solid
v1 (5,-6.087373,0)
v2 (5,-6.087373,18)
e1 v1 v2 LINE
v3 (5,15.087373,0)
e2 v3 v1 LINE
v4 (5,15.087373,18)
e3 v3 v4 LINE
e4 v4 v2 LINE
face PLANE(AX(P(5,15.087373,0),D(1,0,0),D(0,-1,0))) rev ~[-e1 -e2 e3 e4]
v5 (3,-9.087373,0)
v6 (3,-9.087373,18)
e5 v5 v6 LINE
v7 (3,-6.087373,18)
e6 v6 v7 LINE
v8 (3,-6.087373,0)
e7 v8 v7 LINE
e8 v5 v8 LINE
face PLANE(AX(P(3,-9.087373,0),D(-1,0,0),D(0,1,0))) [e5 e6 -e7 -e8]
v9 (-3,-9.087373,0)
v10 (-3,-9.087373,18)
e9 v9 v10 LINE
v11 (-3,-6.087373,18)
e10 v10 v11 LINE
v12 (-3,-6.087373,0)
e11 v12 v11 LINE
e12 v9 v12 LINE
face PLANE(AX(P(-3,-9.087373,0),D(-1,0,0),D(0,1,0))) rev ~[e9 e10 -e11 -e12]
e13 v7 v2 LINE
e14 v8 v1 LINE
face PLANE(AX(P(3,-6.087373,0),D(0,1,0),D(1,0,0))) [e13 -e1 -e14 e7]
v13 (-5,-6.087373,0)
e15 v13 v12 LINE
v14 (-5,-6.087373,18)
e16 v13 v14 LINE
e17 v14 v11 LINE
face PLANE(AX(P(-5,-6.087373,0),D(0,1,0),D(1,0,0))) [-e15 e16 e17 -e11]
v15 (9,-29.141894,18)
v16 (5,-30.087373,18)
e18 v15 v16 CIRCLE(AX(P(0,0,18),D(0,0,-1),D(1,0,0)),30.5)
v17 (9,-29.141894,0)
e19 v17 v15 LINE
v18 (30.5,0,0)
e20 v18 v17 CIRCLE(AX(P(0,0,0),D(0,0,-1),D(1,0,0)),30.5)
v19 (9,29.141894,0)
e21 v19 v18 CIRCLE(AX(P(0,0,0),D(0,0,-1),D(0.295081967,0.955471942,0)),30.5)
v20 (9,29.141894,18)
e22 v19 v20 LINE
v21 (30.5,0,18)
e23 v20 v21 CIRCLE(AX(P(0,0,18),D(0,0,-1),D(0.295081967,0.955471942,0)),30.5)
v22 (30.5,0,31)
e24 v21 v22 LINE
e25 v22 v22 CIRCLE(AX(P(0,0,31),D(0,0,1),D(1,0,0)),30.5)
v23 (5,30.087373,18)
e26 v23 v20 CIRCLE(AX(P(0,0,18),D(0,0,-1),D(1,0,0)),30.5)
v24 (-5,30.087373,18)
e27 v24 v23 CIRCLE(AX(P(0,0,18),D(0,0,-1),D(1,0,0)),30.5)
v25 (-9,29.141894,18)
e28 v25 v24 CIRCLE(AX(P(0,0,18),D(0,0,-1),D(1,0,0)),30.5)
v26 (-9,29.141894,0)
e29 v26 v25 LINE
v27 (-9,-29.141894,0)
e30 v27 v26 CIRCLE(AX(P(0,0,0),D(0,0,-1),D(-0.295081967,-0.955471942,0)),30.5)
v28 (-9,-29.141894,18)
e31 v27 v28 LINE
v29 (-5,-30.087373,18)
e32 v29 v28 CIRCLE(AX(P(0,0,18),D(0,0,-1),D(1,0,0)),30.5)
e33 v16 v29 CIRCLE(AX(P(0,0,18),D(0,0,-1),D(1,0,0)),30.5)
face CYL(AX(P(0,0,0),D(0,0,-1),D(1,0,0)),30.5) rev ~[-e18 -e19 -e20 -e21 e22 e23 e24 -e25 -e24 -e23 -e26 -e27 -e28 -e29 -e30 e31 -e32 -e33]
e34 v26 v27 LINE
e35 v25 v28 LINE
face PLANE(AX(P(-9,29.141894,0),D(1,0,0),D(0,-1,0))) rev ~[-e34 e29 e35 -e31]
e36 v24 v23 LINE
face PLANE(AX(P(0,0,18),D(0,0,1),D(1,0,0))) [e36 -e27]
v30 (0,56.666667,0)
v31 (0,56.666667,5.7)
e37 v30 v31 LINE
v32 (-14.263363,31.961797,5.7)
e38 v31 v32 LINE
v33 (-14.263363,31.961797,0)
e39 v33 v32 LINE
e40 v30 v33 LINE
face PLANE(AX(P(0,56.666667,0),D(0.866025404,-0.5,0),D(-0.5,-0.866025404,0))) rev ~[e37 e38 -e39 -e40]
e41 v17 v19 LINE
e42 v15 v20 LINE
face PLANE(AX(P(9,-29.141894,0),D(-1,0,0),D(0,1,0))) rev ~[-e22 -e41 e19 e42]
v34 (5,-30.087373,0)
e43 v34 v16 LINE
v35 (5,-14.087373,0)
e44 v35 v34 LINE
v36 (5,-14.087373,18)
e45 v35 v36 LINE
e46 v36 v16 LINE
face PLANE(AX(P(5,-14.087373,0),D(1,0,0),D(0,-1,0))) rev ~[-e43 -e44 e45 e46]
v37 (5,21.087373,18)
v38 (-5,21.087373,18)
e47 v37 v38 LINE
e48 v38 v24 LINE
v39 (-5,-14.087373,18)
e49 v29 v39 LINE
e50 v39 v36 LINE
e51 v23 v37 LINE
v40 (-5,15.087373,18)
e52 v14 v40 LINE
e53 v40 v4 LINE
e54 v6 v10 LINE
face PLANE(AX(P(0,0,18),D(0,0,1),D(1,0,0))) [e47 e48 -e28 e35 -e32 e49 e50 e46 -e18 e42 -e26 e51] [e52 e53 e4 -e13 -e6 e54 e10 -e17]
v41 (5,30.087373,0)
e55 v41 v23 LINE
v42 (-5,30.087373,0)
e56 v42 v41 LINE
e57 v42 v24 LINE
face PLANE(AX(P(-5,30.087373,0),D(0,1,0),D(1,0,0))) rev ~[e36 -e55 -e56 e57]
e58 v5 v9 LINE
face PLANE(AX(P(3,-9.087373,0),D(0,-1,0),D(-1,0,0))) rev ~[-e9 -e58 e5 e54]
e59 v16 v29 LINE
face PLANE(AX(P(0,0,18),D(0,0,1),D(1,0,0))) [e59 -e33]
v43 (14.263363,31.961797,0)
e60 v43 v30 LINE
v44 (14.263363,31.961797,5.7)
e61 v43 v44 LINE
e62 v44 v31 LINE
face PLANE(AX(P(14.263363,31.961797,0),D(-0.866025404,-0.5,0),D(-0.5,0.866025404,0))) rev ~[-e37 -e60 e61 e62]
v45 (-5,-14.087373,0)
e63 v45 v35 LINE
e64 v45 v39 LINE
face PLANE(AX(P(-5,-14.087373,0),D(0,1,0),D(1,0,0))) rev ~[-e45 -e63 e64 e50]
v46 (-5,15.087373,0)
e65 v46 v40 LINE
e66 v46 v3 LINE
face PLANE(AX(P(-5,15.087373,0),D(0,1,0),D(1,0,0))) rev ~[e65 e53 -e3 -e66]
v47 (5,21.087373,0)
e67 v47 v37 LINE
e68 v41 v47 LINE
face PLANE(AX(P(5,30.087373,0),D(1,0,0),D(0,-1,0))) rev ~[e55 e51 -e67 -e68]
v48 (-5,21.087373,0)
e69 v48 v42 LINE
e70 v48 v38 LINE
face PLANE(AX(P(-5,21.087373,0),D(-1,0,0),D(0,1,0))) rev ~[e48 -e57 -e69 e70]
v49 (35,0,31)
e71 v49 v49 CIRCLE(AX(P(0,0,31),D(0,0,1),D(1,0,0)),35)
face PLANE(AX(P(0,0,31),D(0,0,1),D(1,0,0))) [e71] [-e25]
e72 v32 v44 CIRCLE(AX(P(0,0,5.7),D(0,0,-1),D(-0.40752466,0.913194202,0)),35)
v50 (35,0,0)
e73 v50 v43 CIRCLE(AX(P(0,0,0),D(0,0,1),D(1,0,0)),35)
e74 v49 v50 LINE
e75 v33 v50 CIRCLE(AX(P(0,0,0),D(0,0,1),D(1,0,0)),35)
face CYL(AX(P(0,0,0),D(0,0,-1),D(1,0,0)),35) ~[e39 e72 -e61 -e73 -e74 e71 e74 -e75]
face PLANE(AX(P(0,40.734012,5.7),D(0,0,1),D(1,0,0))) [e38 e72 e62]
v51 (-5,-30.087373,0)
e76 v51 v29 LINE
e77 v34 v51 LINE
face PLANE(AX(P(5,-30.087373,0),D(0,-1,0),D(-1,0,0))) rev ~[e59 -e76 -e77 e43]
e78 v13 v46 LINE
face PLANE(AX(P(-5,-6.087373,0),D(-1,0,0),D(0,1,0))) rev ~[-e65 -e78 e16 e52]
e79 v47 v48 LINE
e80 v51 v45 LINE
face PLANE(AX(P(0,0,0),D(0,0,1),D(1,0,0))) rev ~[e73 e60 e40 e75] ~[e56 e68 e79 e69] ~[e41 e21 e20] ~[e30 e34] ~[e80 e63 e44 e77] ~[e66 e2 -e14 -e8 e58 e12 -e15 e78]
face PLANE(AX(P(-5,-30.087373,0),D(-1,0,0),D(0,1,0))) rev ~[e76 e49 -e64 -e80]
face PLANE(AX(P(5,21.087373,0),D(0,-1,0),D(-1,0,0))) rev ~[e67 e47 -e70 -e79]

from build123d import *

# Parameters (mm, degrees)
F0_R     = 35
F0_W     = 2
F0_H     = 3
F1_DEPTH = 18
F2_R     = 35
F2_R_2   = 30.5
F3_DEPTH = 31
F5_DEPTH = 5.7


with BuildPart() as f1:
    # F0 (on Top) → F1 (new body)
    with BuildSketch(Plane.XY):
        Circle(F0_R)
        with BuildLine():
            ThreePointArc((-5, 30.0873727667), (0, 30.5), (5, 30.0873727667))
            Line((5, 30.0873727667), (9, 30.0873727667))
            Line((9, 30.0873727667), (9, 29.1418942418))
            ThreePointArc((9, 29.1418942418), (24.5433290325, 18.1073189622), (30.5, 0))
            ThreePointArc((30.5, 0), (24.5433290325, -18.1073189622), (9, -29.1418942418))
            ThreePointArc((9, -29.1418942418), (7.0159448694, -29.6820908561), (5, -30.0873727667))
            ThreePointArc((5, -30.0873727667), (0, -30.5), (-5, -30.0873727667))
            Line((-5, -30.0873727667), (-9, -30.0876272333))
            Line((-9, -30.0876272333), (-9, -29.1418942418))
            ThreePointArc((-9, -29.1418942418), (-30.5, 0), (-9, 29.1418942418))
            Line((-9, 29.1418942418), (-9, 30.0873727667))
            Line((-9, 30.0873727667), (-5, 30.0873727667))
        make_face(mode=Mode.SUBTRACT)
        with BuildLine():
            Line((-5, 30.0873727667), (5, 30.0873727667))
            ThreePointArc((5, 30.0873727667), (0, 30.5), (-5, 30.0873727667))
        make_face()
        with BuildLine():
            Line((9, 30.0873727667), (5, 30.0873727667))
            ThreePointArc((5, 30.0873727667), (7.0159448694, 29.6820908561), (9, 29.1418942418))
            Line((9, 29.1418942418), (9, 30.0873727667))
        make_face()
        with BuildLine():
            ThreePointArc((9, 29.1418942418), (7.0159448694, 29.6820908561), (5, 30.0873727667))
            Line((5, 30.0873727667), (5, 21.0873727667))
            Line((5, 21.0873727667), (5, 15.0873727667))
            Line((5, 15.0873727667), (5, -6.0873727667))
            Line((5, -6.0873727667), (5, -9.0873727667))
            Line((5, -9.0873727667), (5, -14.0873727667))
            Line((5, -14.0873727667), (5, -30.0873727667))
            ThreePointArc((5, -30.0873727667), (7.0159448694, -29.6820908561), (9, -29.1418942418))
            Line((9, -29.1418942418), (9, 29.1418942418))
        make_face()
        with BuildLine():
            Line((-5, 21.0873727667), (-5, 30.0873727667))
            ThreePointArc((-5, 30.0873727667), (-7.0159448694, 29.6820908561), (-9, 29.1418942418))
            Line((-9, 29.1418942418), (-9, -29.1418942418))
            ThreePointArc((-9, -29.1418942418), (-7.0159448694, -29.6820908561), (-5, -30.0873727667))
            Line((-5, -30.0873727667), (-5, -14.0873727667))
            Line((-5, -14.0873727667), (-5, -9.0873727667))
            Line((-5, -9.0873727667), (-5, -6.0873727667))
            Line((-5, -6.0873727667), (-5, 15.0873727667))
            Line((-5, 15.0873727667), (-5, 21.0873727667))
        make_face()
        with BuildLine():
            ThreePointArc((-9, 29.1418942418), (-7.0159448694, 29.6820908561), (-5, 30.0873727667))
            Line((-5, 30.0873727667), (-9, 30.0873727667))
            Line((-9, 30.0873727667), (-9, 29.1418942418))
        make_face()
        Polygon((5, 15.0873727667), (5, 21.0873727667), (0, 21.0873727667), (-5, 21.0873727667), (-5, 15.0873727667), (0, 15.0873727667), align=None)
        with BuildLine():
            ThreePointArc((-5, -30.0873727667), (-7.0159448694, -29.6820908561), (-9, -29.1418942418))
            Line((-9, -29.1418942418), (-9, -30.0876272333))
            Line((-9, -30.0876272333), (-5, -30.0873727667))
        make_face()
        with BuildLine():
            ThreePointArc((-5, -30.0873727667), (0, -30.5), (5, -30.0873727667))
            Line((5, -30.0873727667), (-5, -30.0873727667))
        make_face()
        with Locations((4, -7.5873727667)):
            Rectangle(F0_W, F0_H)
        with Locations((-4, -7.5873727667)):
            Rectangle(F0_W, F0_H)
        Polygon((0, -14.0873727667), (5, -14.0873727667), (5, -9.0873727667), (3, -9.0873727667), (0, -9.0873727667), (-3, -9.0873727667), (-5, -9.0873727667), (-5, -14.0873727667), align=None)
    extrude(amount=F1_DEPTH)

    # F2 (on Top) → F3 (join)
    with BuildSketch(Plane.XY):
        Circle(F2_R)
        Circle(F2_R_2, mode=Mode.SUBTRACT)
    extrude(amount=F3_DEPTH)

    # F4 (on Top) → F5 (join)
    with BuildSketch(Plane.XY):
        with BuildLine():
            ThreePointArc((-14.2633631023, 31.9617970867), (0, 35), (14.2633631023, 31.9617970867))
            Line((14.2633631023, 31.9617970867), (0, 56.6666666667))
            Line((0, 56.6666666667), (-14.2633631023, 31.9617970867))
        make_face()
    extrude(amount=F5_DEPTH)


solid = f1.part
